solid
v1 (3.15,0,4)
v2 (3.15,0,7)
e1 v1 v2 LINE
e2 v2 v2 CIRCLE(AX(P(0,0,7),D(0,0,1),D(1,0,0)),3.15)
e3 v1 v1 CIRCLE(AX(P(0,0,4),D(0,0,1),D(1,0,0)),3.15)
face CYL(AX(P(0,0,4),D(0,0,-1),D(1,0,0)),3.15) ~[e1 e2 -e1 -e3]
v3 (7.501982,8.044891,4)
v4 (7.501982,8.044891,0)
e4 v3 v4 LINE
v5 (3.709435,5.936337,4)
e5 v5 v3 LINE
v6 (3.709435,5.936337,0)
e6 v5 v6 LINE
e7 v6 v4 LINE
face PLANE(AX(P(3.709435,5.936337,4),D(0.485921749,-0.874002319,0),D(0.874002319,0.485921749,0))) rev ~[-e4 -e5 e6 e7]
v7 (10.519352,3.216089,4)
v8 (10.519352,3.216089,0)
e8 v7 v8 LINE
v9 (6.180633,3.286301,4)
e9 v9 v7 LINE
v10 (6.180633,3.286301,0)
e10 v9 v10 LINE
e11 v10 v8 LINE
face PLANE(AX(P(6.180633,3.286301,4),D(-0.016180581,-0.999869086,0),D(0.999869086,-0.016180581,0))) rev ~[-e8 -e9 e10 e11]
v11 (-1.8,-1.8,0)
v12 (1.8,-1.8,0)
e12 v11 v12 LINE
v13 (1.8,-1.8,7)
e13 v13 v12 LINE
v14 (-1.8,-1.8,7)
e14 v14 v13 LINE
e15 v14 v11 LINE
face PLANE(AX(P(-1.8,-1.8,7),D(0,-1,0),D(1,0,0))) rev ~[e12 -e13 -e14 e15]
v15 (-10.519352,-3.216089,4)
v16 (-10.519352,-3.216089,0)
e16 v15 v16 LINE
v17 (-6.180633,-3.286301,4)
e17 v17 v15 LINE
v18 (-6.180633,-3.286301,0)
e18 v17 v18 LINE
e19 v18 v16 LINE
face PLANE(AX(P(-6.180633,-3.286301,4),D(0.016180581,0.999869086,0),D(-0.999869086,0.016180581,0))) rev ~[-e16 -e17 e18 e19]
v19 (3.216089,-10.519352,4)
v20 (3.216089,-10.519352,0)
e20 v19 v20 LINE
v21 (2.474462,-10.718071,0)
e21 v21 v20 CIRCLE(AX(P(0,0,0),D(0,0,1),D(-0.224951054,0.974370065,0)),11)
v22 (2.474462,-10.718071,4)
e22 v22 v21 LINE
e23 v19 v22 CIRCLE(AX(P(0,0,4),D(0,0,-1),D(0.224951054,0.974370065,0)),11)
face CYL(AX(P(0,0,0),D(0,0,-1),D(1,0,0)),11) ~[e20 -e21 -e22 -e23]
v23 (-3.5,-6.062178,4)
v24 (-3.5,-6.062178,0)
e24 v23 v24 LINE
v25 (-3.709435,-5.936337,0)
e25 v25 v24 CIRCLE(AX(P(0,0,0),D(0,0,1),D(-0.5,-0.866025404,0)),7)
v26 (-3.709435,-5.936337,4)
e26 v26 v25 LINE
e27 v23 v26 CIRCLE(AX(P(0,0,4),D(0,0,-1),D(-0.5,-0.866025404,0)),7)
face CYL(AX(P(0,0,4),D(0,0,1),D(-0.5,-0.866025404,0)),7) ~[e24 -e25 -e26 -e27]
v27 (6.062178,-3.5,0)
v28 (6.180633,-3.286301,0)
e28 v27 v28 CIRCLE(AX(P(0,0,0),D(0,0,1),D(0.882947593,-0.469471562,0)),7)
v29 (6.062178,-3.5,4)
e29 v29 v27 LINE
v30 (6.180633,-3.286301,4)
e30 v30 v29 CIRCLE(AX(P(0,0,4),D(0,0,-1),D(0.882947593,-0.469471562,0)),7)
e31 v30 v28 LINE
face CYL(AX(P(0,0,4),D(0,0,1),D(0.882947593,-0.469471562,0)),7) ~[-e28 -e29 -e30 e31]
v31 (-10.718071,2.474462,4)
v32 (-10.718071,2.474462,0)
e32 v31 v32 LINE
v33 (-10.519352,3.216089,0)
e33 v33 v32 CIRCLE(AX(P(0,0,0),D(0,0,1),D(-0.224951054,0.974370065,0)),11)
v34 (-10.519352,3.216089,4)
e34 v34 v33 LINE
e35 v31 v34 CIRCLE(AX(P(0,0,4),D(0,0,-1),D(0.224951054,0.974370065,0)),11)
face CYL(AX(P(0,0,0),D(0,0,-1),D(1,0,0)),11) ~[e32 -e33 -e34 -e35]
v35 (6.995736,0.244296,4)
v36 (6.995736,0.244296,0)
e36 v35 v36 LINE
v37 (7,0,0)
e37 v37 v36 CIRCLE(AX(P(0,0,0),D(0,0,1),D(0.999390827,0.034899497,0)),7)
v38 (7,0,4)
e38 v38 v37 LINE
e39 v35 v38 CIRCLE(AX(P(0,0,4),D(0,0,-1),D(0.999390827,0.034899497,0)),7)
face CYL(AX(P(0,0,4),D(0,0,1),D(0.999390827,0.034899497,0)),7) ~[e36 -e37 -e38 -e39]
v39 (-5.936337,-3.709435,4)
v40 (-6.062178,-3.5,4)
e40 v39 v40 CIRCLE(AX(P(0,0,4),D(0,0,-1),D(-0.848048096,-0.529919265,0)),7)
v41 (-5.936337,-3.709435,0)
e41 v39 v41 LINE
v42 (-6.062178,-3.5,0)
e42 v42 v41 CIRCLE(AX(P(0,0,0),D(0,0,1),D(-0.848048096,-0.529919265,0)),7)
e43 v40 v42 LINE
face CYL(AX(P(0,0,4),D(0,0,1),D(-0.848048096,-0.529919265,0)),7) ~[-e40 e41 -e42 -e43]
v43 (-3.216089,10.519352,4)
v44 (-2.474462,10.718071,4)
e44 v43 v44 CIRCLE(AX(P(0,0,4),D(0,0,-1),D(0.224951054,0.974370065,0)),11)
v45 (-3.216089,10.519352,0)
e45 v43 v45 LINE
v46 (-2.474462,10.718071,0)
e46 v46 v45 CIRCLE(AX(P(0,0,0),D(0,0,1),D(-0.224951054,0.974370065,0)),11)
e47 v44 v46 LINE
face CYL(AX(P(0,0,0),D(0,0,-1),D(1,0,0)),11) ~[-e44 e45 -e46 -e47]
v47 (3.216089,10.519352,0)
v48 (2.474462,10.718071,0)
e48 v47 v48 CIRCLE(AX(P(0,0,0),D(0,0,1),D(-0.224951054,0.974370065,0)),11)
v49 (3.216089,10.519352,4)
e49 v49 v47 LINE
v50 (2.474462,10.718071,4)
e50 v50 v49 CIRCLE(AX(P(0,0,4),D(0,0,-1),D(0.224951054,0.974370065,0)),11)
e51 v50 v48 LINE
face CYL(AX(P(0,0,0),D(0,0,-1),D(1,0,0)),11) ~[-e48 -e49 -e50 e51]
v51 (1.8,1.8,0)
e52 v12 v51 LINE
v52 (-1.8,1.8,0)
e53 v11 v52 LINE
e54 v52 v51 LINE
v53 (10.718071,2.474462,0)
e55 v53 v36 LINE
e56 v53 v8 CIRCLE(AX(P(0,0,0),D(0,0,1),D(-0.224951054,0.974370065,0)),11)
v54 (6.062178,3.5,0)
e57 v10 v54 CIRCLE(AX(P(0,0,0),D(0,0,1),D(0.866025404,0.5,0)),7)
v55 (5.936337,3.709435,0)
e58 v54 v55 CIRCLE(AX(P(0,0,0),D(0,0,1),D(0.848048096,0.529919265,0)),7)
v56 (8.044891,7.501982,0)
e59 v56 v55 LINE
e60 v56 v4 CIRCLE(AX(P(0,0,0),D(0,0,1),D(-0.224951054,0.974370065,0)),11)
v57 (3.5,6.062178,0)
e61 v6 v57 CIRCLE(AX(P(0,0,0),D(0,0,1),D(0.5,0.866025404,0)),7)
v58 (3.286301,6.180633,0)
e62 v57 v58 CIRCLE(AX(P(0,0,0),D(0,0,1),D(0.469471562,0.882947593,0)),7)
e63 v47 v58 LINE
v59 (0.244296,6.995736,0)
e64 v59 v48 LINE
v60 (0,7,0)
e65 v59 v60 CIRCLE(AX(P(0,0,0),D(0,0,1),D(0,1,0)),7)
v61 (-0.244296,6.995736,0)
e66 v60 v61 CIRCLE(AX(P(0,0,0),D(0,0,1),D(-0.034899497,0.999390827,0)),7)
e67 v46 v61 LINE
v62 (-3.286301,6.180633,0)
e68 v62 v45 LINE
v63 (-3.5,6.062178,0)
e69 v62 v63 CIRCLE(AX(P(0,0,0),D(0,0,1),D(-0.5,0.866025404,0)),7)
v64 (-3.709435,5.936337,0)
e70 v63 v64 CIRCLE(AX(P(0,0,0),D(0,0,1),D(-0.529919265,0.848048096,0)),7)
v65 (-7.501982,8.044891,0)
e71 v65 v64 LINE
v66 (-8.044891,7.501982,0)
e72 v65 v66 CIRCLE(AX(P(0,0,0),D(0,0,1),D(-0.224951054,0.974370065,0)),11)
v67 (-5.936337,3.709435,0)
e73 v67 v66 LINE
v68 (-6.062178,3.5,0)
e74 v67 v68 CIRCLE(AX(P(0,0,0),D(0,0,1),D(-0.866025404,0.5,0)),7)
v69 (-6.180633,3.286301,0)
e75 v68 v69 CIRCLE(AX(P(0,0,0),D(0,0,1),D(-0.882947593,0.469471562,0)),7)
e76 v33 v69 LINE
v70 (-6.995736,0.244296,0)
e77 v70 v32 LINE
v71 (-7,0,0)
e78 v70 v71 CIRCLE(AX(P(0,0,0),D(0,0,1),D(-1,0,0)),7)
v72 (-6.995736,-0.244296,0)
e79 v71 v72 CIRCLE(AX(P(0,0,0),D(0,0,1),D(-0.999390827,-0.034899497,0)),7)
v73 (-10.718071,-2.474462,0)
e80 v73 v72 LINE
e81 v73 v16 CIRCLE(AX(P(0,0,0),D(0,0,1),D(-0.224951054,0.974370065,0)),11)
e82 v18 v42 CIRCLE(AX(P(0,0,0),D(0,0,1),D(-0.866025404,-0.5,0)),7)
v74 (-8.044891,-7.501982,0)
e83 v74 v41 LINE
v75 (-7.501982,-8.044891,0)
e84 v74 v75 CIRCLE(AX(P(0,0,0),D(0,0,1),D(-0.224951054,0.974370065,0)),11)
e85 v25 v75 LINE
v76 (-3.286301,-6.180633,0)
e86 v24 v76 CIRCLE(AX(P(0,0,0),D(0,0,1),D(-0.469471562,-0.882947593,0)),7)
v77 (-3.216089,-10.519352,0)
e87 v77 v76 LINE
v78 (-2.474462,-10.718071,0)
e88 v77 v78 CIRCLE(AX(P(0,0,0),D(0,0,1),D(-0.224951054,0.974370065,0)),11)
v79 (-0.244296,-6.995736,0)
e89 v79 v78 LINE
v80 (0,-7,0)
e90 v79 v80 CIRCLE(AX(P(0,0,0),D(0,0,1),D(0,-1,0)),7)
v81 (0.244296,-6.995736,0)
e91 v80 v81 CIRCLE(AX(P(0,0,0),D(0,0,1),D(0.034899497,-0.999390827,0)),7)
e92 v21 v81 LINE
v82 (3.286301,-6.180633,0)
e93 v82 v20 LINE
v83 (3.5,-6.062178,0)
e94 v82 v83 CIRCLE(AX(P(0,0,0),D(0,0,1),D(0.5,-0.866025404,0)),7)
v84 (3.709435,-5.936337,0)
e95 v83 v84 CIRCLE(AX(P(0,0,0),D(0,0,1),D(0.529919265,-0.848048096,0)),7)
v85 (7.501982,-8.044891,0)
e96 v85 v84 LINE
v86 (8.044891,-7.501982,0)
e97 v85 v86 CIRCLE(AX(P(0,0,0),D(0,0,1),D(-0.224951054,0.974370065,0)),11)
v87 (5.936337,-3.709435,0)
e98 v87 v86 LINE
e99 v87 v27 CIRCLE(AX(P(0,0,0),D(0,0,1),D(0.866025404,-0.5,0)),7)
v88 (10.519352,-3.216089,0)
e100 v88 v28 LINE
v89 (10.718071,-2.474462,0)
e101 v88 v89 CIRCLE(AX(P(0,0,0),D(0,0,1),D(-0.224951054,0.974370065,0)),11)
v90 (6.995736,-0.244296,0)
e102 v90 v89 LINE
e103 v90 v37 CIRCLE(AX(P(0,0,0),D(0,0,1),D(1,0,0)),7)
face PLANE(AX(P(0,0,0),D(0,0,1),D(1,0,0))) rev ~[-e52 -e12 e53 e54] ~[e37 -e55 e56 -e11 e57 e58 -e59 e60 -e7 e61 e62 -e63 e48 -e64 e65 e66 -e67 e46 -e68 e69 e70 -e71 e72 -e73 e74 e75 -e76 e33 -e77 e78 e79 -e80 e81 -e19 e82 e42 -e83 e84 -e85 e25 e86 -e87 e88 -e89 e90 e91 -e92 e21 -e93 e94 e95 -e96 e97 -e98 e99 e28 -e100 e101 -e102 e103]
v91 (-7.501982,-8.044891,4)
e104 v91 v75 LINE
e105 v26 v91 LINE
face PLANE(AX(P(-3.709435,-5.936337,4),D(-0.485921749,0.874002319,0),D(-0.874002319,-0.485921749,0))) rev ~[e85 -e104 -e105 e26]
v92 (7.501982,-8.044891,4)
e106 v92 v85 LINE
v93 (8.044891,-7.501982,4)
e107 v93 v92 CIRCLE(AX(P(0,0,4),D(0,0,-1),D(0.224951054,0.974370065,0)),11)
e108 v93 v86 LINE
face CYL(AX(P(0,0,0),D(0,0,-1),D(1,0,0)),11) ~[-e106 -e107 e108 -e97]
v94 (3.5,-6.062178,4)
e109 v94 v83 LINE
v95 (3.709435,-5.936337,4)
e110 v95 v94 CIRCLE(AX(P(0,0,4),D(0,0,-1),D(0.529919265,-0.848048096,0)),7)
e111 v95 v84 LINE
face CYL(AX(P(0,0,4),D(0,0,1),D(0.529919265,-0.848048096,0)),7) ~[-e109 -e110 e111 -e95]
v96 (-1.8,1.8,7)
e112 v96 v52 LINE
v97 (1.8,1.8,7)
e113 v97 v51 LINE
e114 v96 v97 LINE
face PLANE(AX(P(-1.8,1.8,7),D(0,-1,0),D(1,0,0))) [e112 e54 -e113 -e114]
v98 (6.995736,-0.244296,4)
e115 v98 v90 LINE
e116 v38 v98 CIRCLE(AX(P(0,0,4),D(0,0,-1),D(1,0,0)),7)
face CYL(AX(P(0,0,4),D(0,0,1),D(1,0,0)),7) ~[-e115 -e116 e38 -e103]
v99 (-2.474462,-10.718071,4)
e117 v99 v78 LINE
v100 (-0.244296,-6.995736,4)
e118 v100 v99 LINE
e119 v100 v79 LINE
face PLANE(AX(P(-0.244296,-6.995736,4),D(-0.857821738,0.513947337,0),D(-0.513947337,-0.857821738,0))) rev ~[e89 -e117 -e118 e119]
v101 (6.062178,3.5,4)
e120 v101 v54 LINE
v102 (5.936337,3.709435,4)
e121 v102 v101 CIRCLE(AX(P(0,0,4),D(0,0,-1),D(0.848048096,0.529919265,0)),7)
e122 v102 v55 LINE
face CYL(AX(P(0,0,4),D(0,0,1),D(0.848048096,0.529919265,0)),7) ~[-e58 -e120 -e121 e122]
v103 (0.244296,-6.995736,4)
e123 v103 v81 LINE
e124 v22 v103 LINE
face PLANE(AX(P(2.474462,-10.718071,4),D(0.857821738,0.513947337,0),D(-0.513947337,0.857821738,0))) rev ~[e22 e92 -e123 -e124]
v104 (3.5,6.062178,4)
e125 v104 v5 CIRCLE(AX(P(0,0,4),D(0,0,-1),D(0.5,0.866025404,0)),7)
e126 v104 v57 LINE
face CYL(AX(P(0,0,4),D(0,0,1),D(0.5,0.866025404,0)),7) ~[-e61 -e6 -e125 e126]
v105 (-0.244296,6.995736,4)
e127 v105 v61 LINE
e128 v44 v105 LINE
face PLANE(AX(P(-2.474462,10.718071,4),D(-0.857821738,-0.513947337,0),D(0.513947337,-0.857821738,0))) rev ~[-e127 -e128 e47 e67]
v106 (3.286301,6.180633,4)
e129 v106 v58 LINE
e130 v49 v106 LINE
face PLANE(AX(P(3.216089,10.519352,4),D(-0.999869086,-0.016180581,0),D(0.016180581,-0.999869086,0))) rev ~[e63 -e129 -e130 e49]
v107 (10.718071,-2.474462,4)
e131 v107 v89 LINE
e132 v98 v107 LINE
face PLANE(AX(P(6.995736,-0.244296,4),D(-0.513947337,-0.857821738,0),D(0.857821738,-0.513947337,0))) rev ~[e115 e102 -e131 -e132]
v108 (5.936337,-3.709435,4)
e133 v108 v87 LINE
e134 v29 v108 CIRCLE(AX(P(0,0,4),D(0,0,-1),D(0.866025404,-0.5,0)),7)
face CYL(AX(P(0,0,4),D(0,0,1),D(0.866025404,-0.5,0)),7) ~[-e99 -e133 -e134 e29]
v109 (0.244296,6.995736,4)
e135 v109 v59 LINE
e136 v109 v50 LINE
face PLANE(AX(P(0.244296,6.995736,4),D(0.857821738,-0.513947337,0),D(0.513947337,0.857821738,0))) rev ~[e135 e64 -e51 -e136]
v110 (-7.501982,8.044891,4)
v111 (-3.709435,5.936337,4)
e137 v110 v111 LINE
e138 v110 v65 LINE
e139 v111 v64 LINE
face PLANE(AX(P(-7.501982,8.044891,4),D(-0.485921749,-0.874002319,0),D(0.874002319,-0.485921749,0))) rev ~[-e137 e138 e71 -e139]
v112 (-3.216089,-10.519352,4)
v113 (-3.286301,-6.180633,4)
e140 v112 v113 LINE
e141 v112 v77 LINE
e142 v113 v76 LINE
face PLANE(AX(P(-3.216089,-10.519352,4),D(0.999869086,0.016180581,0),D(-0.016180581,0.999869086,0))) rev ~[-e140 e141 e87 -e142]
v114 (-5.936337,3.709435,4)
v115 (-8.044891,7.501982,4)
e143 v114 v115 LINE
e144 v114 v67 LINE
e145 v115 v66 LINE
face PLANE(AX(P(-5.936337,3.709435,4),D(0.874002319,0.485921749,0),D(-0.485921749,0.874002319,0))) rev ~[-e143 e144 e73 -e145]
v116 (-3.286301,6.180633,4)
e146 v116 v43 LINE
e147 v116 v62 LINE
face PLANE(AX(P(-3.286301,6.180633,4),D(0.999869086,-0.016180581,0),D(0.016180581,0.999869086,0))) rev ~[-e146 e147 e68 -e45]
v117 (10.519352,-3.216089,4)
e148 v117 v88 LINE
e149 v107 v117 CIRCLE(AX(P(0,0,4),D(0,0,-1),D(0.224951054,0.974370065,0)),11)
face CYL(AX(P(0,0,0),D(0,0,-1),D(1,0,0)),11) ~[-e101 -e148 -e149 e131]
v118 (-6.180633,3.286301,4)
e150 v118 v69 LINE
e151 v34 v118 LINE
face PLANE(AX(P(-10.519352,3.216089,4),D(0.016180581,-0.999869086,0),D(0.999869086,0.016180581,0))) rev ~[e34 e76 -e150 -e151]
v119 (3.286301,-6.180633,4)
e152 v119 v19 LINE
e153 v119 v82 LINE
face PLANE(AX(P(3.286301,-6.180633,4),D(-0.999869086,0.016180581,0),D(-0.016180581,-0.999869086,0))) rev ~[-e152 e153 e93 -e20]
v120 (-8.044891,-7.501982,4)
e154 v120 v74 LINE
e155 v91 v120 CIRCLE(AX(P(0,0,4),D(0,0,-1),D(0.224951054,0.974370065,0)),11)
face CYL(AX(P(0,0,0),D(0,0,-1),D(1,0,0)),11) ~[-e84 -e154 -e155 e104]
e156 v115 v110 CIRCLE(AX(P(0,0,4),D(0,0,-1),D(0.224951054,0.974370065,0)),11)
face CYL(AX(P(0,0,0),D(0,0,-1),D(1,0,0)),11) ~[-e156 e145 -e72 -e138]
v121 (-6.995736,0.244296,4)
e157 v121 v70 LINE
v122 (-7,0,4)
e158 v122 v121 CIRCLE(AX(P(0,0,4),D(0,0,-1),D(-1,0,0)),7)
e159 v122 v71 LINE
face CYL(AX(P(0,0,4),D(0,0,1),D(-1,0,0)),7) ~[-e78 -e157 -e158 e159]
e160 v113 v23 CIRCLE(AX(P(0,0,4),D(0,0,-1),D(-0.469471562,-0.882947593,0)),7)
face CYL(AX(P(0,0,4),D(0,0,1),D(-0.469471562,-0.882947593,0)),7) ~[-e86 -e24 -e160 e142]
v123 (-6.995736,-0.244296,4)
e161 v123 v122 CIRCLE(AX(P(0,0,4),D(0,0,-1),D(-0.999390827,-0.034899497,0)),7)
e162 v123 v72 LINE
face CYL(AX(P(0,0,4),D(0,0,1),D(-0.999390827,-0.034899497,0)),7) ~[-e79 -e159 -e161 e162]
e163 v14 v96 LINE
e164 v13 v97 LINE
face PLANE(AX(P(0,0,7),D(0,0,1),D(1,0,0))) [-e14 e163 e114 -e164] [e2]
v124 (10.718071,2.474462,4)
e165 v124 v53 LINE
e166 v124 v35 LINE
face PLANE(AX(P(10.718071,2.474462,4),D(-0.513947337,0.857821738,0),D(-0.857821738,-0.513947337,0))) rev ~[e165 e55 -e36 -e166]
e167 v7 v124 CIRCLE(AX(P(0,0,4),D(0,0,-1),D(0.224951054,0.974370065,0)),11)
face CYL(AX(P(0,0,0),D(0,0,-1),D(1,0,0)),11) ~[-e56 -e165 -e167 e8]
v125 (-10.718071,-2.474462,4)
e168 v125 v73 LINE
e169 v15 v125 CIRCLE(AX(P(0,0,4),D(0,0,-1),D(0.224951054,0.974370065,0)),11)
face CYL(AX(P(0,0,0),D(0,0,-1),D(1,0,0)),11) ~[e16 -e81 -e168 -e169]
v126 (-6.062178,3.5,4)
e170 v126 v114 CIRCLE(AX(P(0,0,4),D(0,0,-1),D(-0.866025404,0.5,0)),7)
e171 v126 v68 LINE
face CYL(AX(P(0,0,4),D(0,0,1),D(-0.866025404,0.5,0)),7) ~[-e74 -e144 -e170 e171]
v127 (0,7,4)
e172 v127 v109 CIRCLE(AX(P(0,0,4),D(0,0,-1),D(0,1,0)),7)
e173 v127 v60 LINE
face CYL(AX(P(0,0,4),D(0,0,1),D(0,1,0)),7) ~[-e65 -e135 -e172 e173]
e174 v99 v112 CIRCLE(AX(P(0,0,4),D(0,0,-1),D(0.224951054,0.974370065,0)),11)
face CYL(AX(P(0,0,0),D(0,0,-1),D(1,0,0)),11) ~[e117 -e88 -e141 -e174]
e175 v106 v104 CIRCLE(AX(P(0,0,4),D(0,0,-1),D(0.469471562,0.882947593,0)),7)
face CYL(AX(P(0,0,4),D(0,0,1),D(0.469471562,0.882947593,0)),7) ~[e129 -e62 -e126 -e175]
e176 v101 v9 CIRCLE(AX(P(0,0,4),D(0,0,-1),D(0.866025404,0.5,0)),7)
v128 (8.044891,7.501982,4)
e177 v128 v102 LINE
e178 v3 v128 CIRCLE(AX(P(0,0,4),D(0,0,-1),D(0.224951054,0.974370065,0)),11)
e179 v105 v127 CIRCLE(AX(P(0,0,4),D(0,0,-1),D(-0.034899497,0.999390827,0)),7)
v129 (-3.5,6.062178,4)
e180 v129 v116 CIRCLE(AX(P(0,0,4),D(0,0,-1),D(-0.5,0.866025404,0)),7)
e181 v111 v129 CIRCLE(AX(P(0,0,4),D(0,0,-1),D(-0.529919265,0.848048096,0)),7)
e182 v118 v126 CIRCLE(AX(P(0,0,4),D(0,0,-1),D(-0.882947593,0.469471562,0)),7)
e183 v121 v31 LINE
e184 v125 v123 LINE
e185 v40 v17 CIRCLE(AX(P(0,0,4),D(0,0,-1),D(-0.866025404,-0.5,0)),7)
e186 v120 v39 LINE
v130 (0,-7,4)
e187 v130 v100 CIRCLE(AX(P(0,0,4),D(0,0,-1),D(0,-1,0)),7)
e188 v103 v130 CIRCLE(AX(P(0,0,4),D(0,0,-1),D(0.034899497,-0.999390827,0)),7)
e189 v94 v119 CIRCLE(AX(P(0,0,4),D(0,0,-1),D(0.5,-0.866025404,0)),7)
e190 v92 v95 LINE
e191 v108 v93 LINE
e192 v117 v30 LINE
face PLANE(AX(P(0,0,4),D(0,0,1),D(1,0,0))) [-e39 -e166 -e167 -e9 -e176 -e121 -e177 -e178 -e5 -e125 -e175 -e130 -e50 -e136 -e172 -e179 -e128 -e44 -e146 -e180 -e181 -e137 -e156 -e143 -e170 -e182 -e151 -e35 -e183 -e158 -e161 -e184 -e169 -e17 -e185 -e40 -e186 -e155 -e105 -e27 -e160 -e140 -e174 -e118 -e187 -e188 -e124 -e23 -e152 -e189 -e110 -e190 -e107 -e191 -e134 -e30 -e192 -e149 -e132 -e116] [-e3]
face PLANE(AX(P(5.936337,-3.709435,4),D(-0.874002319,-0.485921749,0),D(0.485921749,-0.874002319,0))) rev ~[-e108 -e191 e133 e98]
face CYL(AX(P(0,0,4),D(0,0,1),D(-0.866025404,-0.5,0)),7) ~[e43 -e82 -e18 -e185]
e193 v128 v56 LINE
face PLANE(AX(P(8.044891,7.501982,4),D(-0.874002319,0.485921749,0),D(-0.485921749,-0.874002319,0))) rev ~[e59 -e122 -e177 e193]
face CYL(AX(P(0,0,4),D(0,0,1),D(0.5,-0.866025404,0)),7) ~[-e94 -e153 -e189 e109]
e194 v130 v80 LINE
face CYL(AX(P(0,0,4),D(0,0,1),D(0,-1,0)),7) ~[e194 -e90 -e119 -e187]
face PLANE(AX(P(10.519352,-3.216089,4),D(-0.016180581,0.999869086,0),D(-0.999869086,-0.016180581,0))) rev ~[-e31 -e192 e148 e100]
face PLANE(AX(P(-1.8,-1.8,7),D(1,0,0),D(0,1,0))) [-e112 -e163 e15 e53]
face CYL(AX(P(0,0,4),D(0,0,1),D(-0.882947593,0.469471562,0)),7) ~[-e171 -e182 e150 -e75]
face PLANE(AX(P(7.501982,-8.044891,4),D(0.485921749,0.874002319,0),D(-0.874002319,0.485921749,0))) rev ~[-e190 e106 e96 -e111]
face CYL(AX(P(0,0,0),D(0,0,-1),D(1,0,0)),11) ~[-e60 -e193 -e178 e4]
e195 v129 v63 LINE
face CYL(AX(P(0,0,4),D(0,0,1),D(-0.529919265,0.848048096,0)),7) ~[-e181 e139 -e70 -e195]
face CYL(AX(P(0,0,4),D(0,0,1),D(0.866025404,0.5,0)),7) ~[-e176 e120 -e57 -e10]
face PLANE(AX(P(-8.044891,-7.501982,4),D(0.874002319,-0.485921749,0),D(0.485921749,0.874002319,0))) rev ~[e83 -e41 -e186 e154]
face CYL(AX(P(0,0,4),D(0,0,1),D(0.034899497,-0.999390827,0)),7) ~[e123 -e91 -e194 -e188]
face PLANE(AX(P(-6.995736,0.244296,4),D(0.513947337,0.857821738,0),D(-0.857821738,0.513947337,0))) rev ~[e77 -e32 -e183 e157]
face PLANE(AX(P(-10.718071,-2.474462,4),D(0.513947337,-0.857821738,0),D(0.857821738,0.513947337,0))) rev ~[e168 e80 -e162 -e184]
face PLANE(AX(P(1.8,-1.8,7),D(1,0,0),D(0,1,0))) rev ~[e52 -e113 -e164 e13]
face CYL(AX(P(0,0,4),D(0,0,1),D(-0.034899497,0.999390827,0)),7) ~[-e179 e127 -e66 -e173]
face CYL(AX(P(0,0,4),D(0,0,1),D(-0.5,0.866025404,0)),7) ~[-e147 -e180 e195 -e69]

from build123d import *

# Parameters (mm, degrees)
F0_R            = 11
F1_DEPTH        = 4
F3_DEPTH        = 4.001
F3_COPIES_COUNT = 12
F5_R            = 3.15
F6_DEPTH        = 3
F7_W            = 3.6
F7_H            = 3.6
F8_DEPTH        = 7


# Not quite as in the source:
# - a pattern or mirror of a feature is missing from the dataset's text; its kind, count and spacing are read off the source's solid


with BuildPart() as f1:
    # F0 (on Top) → F1 (new body)
    with BuildSketch(Plane.XY):
        Circle(F0_R)
    extrude(amount=F1_DEPTH)

    # F2 (on face) → F3 (cut, through all)
    with BuildSketch(Plane.XY.offset(4)):
        with BuildLine():
            ThreePointArc((-0.2442964769, 6.9957357891), (-0.1221668451, 6.9989338661), (0, 7))
            Line((0, 7), (0, 11))
            ThreePointArc((0, 11), (-1.2452353514, 10.9292904124), (-2.4744615978, 10.7180707126))
            Line((-2.4744615978, 10.7180707126), (-0.2442964769, 6.9957357891))
        make_face()
        with BuildLine():
            Line((0, 11), (0, 7))
            ThreePointArc((0, 7), (0.1221668451, 6.9989338661), (0.2442964769, 6.9957357891))
            Line((0.2442964769, 6.9957357891), (2.4744615978, 10.7180707126))
            ThreePointArc((2.4744615978, 10.7180707126), (1.2452353514, 10.9292904124), (0, 11))
        make_face()
    f3 = extrude(amount=-F3_DEPTH, mode=Mode.SUBTRACT)

    # F3_copies: F3 ×12 about axis
    f3_copies_axis = Axis((0, 0, 0), (0, 0, 1))
    for i in range(1, F3_COPIES_COUNT):
        add(f3.rotate(f3_copies_axis, i * 360 / F3_COPIES_COUNT), mode=Mode.SUBTRACT)

    # F5 (on face) → F6 (join)
    with BuildSketch(Plane.XY.offset(4)):
        Circle(F5_R)
    extrude(amount=F6_DEPTH)

    # F7 (on face) → F8 (cut, through all)
    with BuildSketch(Plane.XY.offset(7)):
        Rectangle(F7_W, F7_H)
    extrude(amount=-F8_DEPTH, mode=Mode.SUBTRACT)


solid = f1.part
